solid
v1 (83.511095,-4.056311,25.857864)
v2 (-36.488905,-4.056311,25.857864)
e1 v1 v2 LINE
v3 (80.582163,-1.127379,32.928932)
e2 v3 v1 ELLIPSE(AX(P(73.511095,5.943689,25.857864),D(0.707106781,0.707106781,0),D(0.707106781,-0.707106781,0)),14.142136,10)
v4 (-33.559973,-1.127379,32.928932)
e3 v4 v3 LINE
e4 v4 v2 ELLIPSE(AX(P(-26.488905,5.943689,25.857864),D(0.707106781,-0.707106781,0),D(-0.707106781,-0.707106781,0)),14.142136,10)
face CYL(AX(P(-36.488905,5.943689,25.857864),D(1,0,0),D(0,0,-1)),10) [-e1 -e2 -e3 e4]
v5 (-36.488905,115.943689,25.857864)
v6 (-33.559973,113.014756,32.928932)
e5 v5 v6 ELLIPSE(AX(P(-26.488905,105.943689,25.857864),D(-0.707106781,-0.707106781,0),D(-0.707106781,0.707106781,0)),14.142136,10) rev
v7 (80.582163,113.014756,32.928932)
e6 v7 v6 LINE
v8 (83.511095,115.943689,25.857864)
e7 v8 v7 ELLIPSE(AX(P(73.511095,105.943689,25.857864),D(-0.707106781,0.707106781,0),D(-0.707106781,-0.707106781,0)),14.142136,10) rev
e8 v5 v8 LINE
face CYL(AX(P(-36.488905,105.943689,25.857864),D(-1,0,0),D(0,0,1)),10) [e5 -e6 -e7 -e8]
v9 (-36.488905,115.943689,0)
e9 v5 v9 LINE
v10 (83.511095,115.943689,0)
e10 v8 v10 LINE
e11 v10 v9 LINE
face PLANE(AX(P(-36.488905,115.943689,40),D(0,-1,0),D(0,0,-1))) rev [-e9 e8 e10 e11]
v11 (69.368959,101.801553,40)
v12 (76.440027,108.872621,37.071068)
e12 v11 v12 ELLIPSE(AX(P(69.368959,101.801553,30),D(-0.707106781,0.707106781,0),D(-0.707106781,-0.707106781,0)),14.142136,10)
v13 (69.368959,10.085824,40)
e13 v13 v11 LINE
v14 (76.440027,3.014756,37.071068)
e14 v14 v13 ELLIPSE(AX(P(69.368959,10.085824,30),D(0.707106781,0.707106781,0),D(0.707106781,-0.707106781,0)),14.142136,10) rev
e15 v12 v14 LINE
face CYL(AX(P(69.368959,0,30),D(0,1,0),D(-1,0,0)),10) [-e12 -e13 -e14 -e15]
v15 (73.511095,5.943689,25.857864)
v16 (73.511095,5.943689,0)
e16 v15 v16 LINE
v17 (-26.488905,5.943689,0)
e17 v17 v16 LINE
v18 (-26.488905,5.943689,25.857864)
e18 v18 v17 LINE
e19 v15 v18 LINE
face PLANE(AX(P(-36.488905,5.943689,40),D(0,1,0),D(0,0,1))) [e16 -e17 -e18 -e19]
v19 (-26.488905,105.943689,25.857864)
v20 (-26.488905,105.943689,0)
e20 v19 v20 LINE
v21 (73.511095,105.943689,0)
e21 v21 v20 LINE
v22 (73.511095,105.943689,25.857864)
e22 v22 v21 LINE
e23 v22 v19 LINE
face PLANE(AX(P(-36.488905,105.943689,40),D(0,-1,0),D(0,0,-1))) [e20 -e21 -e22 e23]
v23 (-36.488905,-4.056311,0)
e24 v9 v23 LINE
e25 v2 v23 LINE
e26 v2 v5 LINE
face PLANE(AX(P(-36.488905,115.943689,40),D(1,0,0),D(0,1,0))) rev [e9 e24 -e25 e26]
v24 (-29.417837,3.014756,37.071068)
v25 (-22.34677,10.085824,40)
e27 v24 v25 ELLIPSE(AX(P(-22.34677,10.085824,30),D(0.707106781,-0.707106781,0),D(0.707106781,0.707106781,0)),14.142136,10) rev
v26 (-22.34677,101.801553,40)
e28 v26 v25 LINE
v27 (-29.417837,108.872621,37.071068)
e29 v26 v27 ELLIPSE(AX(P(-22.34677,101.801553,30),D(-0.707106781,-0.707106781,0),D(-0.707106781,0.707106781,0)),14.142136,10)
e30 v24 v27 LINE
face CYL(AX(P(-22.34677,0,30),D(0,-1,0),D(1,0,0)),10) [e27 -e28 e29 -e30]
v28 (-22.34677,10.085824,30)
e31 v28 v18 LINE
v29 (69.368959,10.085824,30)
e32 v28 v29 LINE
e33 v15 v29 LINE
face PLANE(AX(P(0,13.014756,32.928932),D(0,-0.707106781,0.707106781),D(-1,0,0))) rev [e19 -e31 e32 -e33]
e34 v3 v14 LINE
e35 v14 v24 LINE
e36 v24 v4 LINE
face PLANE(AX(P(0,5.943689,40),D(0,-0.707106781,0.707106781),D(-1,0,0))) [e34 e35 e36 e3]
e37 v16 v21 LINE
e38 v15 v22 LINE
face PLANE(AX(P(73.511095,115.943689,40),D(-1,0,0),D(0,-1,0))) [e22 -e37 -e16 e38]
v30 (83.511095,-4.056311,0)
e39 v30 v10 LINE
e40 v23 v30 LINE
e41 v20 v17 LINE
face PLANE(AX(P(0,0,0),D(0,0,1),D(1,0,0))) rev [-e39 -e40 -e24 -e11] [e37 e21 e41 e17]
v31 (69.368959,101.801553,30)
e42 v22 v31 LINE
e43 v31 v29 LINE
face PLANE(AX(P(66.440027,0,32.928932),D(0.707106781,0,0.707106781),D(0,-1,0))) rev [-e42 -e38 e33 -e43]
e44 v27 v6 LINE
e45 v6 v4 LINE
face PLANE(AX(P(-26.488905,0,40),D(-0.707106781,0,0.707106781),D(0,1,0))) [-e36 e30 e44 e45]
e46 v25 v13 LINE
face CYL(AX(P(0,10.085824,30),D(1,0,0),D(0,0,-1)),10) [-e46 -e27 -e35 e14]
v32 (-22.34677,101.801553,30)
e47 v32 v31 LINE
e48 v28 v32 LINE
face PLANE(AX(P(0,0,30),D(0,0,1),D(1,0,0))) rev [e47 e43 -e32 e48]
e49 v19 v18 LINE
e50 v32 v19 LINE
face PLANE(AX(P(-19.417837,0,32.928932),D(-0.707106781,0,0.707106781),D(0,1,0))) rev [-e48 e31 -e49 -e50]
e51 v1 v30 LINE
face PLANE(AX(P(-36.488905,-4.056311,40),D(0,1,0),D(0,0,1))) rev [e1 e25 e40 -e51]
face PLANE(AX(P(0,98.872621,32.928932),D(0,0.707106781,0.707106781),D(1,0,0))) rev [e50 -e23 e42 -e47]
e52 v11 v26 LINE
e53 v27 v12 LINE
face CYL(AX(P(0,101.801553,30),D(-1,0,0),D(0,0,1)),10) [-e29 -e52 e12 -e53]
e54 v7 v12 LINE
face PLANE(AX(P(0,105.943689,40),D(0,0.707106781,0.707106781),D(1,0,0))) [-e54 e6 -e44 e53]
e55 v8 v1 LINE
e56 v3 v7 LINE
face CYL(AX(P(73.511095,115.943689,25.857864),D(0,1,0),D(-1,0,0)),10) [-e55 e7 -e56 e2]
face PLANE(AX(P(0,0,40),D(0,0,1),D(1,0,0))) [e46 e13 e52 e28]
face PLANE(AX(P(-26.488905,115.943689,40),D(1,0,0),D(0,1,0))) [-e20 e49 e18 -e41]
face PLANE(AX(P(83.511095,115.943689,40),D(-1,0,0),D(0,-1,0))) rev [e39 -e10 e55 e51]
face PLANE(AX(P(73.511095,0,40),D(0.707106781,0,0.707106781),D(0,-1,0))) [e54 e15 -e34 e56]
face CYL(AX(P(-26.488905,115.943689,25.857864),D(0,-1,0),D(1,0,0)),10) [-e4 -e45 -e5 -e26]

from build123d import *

# Parameters (mm, degrees)
SKETCH1_W           = 120
SKETCH1_H           = 120
BOSS_EXTRUDE1_DEPTH = 40
CHAMFER1_SIZE       = 10
FILLET1_R           = 10
SHELL1_START        = -26.488905171
SHELL1_DEPTH        = 100
SHELL1_START_2      = 5
SHELL1_2_DEPTH      = 102


with BuildPart() as part:
    # Sketch1 → Boss-Extrude1 (new body)
    with BuildSketch(Plane.XY):
        with Locations((23.511094829, 55.943688507)):
            Rectangle(SKETCH1_W, SKETCH1_H)
    extrude(amount=BOSS_EXTRUDE1_DEPTH)

    # Chamfer1
    chamfer1_edges = [part.edges().sort_by_distance(p)[0] for p in [
        (83.511094829, 55.943688507, 40),
        (23.511094829, 115.943688507, 40),
        (-36.488905171, 55.943688507, 40),
        (23.511094829, -4.056311493, 40),
    ]]
    chamfer(chamfer1_edges, length=CHAMFER1_SIZE)

    # Fillet1
    fillet1_edges = [part.edges().sort_by_distance(p)[0] for p in [
        (-26.488905171, 55.943688507, 40),
        (23.511094829, 105.943688507, 40),
        (73.511094829, 55.943688507, 40),
        (23.511094829, 5.943688507, 40),
        (23.511094829, -4.056311493, 30),
        (83.511094829, 55.943688507, 30),
        (23.511094829, 115.943688507, 30),
        (-36.488905171, 55.943688507, 30),
    ]]
    fillet(fillet1_edges, radius=FILLET1_R)

    # Shell1: read off the stored shape, not the designer's step
    # Shell1 outline → Shell1 (cut)
    with BuildSketch(Plane.YZ.offset(SHELL1_START)):
        Polygon((5.943688507, 25.857864376), (5.943688507, 0), (105.943688507, 0), (105.943688507, 25.857864376), (101.801552884, 30), (10.085824131, 30), align=None)
    extrude(amount=SHELL1_DEPTH, mode=Mode.SUBTRACT)

    # Shell1 2 outline → Shell1 2 (add)
    with BuildSketch(Plane(origin=(0, 0, 0), x_dir=(1, 0, 0), z_dir=(0, 1, 0)).offset(SHELL1_START_2)):
        Polygon((73.511094829, -25.857864376), (69.368959206, -30), (73.511094829, -30), align=None)
        Polygon((-22.346769547, -30), (-26.488905171, -25.857864376), (-26.488905171, -30), align=None)
    extrude(amount=SHELL1_2_DEPTH)


solid = part.part
